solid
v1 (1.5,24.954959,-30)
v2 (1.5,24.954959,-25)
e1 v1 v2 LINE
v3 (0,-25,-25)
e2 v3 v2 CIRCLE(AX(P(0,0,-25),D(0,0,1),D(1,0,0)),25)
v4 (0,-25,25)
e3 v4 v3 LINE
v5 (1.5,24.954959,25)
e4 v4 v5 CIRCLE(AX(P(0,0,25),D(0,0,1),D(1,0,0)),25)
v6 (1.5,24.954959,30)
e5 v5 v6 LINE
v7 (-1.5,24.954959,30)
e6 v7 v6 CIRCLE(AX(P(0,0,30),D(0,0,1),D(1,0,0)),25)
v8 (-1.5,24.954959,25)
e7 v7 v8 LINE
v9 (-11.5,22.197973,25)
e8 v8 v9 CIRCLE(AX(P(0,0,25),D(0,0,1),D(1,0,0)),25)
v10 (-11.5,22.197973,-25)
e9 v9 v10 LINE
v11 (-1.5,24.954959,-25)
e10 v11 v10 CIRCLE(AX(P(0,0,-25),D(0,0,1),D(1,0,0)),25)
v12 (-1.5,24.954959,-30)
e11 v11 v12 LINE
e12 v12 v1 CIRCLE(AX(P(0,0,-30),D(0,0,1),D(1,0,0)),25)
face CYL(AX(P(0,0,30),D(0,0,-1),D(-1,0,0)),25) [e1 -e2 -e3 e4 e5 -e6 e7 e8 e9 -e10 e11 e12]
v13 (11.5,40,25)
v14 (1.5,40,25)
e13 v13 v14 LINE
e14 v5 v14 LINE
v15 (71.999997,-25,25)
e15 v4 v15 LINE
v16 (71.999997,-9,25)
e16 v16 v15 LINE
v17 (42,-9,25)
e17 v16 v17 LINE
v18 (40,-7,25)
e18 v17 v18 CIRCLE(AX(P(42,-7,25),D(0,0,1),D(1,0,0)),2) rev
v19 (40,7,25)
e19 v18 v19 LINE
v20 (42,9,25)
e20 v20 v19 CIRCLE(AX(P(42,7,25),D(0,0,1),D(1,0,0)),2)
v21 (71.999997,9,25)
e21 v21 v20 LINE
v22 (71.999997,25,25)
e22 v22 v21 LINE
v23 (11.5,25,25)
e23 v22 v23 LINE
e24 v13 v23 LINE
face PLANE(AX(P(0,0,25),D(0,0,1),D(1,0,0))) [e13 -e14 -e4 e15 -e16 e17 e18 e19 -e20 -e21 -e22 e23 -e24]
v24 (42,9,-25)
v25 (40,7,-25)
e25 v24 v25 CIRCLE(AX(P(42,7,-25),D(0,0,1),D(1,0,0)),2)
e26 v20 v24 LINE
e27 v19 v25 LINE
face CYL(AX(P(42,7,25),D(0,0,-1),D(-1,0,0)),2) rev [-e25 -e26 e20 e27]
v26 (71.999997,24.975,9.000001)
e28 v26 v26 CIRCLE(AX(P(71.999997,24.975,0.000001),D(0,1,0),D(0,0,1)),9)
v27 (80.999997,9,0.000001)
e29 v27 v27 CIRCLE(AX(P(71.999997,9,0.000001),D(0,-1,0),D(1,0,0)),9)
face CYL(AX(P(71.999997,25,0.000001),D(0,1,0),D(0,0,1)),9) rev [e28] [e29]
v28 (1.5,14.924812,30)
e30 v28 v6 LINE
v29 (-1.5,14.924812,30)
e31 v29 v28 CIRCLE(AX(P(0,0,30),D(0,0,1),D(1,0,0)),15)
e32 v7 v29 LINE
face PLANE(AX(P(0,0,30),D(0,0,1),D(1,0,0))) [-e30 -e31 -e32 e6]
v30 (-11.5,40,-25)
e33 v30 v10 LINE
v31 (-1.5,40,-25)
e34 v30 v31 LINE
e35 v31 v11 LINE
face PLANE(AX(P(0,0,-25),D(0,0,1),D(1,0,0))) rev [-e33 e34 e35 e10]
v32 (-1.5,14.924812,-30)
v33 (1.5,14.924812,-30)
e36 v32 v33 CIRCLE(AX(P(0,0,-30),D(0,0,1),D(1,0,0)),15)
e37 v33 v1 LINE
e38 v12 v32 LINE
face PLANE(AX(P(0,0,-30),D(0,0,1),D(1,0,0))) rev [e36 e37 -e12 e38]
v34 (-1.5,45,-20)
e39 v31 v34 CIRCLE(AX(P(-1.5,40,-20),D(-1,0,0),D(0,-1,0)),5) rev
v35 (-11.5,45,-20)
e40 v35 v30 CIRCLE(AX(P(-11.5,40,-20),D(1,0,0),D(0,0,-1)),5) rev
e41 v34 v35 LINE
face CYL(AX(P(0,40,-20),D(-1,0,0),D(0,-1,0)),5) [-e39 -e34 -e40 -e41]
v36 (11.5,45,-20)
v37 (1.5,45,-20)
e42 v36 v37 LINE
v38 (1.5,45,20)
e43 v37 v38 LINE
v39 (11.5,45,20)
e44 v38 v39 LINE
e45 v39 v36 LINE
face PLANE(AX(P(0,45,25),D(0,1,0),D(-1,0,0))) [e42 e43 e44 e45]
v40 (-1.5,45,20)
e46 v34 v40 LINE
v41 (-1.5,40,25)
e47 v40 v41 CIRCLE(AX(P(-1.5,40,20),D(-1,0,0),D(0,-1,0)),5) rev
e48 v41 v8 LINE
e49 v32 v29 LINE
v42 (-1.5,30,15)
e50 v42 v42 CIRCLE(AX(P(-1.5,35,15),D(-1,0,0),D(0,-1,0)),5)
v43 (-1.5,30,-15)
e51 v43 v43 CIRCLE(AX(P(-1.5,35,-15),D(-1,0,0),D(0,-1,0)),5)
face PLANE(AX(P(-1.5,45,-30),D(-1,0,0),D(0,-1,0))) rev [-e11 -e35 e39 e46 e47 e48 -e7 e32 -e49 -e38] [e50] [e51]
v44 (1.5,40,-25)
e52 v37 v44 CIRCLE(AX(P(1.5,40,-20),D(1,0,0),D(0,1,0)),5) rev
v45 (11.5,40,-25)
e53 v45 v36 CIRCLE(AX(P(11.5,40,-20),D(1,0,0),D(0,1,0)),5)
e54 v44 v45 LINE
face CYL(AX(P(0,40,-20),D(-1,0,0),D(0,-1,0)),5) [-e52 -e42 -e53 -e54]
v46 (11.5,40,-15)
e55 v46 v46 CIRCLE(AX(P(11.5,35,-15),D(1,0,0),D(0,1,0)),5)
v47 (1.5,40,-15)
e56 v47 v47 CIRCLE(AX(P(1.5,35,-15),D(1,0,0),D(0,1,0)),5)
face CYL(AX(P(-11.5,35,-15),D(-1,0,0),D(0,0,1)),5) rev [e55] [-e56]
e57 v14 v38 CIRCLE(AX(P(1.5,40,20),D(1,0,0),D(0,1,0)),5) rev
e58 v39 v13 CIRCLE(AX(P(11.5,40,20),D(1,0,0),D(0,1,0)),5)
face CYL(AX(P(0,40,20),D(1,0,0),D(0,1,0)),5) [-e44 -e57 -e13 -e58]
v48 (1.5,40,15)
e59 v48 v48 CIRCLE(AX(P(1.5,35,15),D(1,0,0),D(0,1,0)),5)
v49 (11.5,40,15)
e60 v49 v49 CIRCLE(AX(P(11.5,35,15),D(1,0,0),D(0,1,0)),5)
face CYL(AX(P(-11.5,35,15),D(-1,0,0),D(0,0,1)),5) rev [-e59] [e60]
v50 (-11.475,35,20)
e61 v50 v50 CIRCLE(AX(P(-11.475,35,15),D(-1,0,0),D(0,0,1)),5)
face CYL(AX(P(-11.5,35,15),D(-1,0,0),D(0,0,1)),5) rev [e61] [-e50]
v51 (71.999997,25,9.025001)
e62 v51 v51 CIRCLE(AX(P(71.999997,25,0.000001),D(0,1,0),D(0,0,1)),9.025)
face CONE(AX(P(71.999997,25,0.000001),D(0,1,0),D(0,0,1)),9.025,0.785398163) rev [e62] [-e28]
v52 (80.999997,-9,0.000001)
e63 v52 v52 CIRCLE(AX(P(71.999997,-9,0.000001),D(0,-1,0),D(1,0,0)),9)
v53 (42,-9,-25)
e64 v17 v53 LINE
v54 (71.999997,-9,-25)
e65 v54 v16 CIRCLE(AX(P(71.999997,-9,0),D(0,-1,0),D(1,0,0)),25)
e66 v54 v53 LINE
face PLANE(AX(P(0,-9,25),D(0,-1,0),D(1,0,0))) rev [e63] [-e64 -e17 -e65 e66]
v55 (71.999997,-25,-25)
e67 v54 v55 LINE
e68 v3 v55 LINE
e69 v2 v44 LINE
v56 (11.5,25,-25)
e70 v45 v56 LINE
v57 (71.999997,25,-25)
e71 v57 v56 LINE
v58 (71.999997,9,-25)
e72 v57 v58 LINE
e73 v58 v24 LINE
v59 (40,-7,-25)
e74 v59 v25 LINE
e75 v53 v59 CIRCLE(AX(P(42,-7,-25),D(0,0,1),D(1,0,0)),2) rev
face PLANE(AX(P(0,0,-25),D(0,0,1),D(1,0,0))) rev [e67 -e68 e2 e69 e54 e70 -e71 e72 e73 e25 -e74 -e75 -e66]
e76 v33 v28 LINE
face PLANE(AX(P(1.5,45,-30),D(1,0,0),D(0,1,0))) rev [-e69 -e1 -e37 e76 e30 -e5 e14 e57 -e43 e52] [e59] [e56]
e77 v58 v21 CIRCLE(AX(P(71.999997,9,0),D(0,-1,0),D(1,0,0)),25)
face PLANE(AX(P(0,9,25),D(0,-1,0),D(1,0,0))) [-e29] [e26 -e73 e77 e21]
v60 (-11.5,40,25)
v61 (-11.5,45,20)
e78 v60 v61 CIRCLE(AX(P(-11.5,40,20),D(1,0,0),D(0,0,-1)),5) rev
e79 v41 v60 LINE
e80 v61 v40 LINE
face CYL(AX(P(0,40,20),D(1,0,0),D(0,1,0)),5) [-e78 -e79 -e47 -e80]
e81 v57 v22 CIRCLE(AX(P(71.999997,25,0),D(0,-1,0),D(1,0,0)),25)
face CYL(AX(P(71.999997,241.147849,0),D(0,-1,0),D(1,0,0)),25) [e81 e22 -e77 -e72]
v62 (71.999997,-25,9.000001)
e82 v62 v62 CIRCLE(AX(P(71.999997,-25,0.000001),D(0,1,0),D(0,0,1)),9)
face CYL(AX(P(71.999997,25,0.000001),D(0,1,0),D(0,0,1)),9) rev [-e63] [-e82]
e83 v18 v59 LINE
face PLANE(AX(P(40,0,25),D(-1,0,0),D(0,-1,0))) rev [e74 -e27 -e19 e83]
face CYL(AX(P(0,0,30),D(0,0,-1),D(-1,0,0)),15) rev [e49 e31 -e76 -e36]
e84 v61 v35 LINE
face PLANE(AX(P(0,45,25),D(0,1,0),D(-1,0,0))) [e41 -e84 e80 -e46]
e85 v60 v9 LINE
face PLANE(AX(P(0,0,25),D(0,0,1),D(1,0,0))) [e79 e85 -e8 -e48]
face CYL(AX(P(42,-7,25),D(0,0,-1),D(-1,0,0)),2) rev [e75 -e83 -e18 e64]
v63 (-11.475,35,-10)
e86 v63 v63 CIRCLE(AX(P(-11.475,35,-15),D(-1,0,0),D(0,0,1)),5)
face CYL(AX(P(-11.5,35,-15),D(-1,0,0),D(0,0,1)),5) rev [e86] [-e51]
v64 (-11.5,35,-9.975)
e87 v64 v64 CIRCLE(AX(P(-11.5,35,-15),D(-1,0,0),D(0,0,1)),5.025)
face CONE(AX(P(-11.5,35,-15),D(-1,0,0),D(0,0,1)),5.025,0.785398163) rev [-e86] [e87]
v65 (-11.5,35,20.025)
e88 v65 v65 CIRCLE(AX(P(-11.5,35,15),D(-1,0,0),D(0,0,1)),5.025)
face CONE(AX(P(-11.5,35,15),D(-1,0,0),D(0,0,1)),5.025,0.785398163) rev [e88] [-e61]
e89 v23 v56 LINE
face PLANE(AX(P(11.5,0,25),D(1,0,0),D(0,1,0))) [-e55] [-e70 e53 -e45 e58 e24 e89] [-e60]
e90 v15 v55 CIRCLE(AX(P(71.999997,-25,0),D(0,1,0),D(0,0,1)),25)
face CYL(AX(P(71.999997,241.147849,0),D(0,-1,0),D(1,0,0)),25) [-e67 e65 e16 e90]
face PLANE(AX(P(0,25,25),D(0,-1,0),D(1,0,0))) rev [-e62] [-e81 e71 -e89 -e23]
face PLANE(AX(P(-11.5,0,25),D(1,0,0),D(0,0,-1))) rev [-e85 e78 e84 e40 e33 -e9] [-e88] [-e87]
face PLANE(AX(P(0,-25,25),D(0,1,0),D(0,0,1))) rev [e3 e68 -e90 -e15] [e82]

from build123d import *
from OCP.BRepAlgoAPI import BRepAlgoAPI_Cut
from OCP.TopTools import TopTools_ListOfShape

# Parameters (mm, degrees)
SCHIZZO1_R                   = 25
SCHIZZO1_R_2                 = 15
ESTRUSIONE_ESTRUSIONE1_DEPTH = 30
ESTRUSIONE_ESTRUSIONE2_DEPTH = 25
TAGLIO_ESTRUSIONE1_DEPTH     = 123.613212991
FORO_18_0_18_1_D             = 18
FORO_18_0_18_1_CSINK_D       = 18.05
FORO_18_0_18_1_CSINK_ANGLE   = 90
FORO_10_0_10_1_D             = 10
FORO_10_0_10_1_CSINK_D       = 10.05
FORO_10_0_10_1_CSINK_ANGLE   = 90
TAGLIO_ESTRUSIONE2_START     = -51
TAGLIO_ESTRUSIONE2_DEPTH     = 51
RACCORDO1_R                  = 5


with BuildPart() as part:
    # Schizzo1 → Estrusione-Estrusione1 (new, symmetric)
    with BuildSketch(Plane.XY):
        Circle(SCHIZZO1_R)
        Circle(SCHIZZO1_R_2, mode=Mode.SUBTRACT)
    extrude(amount=ESTRUSIONE_ESTRUSIONE1_DEPTH, both=True)

    # Schizzo1<6> → Estrusione-Estrusione2 (add, symmetric)
    with BuildSketch(Plane.XY):
        with BuildLine():
            Line((11.5, 45), (-11.5, 45))
            Line((-11.5, 45), (-11.5, 22.19797288))
            ThreePointArc((-11.5, 22.19797288), (12.990381057, 21.360009363), (25, 0))
            ThreePointArc((25, 0), (17.67766953, -17.67766953), (0, -25))
            Line((0, -25), (97, -25))
            Line((97, -25), (97, -9))
            Line((97, -9), (42, -9))
            ThreePointArc((42, -9), (40.585786438, -8.414213562), (40, -7))
            Line((40, -7), (40, 7))
            ThreePointArc((40, 7), (40.585786438, 8.414213562), (42, 9))
            Line((42, 9), (97, 9))
            Line((97, 9), (97, 25))
            Line((97, 25), (11.5, 25))
            Line((11.5, 25), (11.5, 45))
        make_face()
    extrude(amount=ESTRUSIONE_ESTRUSIONE2_DEPTH, both=True)

    # Schizzo3 → Taglio-Estrusione1 (cut, through all)
    with BuildSketch(Plane.XY.offset(30)):
        Polygon((1.5, 45), (-1.5, 45), (-1.5, 14.924811557), (0, 15), (1.5, 14.924811557), align=None)
    extrude(amount=-TAGLIO_ESTRUSIONE1_DEPTH, mode=Mode.SUBTRACT)

    # Foro Ø18.0 (18)-1 (through all)
    with Locations(Plane(origin=(71.999996961, 25, 6.74e-07), x_dir=(1, 0, 0), z_dir=(0, 1, 0))):
        with Locations((0, 0)):
            CounterSinkHole(FORO_18_0_18_1_D / 2, FORO_18_0_18_1_CSINK_D / 2, counter_sink_angle=FORO_18_0_18_1_CSINK_ANGLE)

    # Foro Ø10.0 (10)-1 (through all)
    with Locations(Plane(origin=(-11.5, 35, 15), x_dir=(0, 0, -1), z_dir=(-1, 0, 0))):
        with Locations((0, 0), (30, 0)):
            CounterSinkHole(FORO_10_0_10_1_D / 2, FORO_10_0_10_1_CSINK_D / 2, counter_sink_angle=FORO_10_0_10_1_CSINK_ANGLE)


with BuildPart() as taglio_estrusione2_tool:
    # Taglio-Estrusione2: read off the stored shape, not the designer's step
    # Taglio-Estrusione2 outline → Taglio-Estrusione2 (new body)
    with BuildSketch(Plane(origin=(0, 25, 0), x_dir=(1, 0, 0), z_dir=(0, 1, 0)).offset(TAGLIO_ESTRUSIONE2_START)):
        with BuildLine():
            Line((97, 25), (71.999996961, 25))
            ThreePointArc((71.999996961, 25), (89.677666491, 17.67766953), (96.999996961, 0))
            Line((96.999996961, 0), (97, 25))
        make_face()
        with BuildLine():
            Line((97, -25), (96.999996961, 0))
            ThreePointArc((96.999996961, 0), (89.677666491, -17.67766953), (71.999996961, -25))
            Line((71.999996961, -25), (97, -25))
        make_face()
    extrude(amount=TAGLIO_ESTRUSIONE2_DEPTH)


with BuildPart() as part_1:
    add(part.part)

    # Taglio-Estrusione2: cut by taglio_estrusione2_tool, with a tolerance
    taglio_estrusione2_stock = TopTools_ListOfShape()
    taglio_estrusione2_stock.Append(part_1.part.wrapped)
    taglio_estrusione2_tools = TopTools_ListOfShape()
    taglio_estrusione2_tools.Append(taglio_estrusione2_tool.part.wrapped)
    taglio_estrusione2_cut = BRepAlgoAPI_Cut()
    taglio_estrusione2_cut.SetArguments(taglio_estrusione2_stock)
    taglio_estrusione2_cut.SetTools(taglio_estrusione2_tools)
    taglio_estrusione2_cut.SetFuzzyValue(0.00001)
    taglio_estrusione2_cut.Build()
    add(Compound.cast(taglio_estrusione2_cut.Shape()).solids(), mode=Mode.REPLACE)

    # Raccordo1
    raccordo1_edges = [part_1.edges().sort_by_distance(p)[0] for p in [
        (-6.5, 45, 25),
        (-6.5, 45, -25),
        (6.5, 45, -25),
        (6.5, 45, 25),
    ]]
    fillet(raccordo1_edges, radius=RACCORDO1_R)


solid = part_1.part
